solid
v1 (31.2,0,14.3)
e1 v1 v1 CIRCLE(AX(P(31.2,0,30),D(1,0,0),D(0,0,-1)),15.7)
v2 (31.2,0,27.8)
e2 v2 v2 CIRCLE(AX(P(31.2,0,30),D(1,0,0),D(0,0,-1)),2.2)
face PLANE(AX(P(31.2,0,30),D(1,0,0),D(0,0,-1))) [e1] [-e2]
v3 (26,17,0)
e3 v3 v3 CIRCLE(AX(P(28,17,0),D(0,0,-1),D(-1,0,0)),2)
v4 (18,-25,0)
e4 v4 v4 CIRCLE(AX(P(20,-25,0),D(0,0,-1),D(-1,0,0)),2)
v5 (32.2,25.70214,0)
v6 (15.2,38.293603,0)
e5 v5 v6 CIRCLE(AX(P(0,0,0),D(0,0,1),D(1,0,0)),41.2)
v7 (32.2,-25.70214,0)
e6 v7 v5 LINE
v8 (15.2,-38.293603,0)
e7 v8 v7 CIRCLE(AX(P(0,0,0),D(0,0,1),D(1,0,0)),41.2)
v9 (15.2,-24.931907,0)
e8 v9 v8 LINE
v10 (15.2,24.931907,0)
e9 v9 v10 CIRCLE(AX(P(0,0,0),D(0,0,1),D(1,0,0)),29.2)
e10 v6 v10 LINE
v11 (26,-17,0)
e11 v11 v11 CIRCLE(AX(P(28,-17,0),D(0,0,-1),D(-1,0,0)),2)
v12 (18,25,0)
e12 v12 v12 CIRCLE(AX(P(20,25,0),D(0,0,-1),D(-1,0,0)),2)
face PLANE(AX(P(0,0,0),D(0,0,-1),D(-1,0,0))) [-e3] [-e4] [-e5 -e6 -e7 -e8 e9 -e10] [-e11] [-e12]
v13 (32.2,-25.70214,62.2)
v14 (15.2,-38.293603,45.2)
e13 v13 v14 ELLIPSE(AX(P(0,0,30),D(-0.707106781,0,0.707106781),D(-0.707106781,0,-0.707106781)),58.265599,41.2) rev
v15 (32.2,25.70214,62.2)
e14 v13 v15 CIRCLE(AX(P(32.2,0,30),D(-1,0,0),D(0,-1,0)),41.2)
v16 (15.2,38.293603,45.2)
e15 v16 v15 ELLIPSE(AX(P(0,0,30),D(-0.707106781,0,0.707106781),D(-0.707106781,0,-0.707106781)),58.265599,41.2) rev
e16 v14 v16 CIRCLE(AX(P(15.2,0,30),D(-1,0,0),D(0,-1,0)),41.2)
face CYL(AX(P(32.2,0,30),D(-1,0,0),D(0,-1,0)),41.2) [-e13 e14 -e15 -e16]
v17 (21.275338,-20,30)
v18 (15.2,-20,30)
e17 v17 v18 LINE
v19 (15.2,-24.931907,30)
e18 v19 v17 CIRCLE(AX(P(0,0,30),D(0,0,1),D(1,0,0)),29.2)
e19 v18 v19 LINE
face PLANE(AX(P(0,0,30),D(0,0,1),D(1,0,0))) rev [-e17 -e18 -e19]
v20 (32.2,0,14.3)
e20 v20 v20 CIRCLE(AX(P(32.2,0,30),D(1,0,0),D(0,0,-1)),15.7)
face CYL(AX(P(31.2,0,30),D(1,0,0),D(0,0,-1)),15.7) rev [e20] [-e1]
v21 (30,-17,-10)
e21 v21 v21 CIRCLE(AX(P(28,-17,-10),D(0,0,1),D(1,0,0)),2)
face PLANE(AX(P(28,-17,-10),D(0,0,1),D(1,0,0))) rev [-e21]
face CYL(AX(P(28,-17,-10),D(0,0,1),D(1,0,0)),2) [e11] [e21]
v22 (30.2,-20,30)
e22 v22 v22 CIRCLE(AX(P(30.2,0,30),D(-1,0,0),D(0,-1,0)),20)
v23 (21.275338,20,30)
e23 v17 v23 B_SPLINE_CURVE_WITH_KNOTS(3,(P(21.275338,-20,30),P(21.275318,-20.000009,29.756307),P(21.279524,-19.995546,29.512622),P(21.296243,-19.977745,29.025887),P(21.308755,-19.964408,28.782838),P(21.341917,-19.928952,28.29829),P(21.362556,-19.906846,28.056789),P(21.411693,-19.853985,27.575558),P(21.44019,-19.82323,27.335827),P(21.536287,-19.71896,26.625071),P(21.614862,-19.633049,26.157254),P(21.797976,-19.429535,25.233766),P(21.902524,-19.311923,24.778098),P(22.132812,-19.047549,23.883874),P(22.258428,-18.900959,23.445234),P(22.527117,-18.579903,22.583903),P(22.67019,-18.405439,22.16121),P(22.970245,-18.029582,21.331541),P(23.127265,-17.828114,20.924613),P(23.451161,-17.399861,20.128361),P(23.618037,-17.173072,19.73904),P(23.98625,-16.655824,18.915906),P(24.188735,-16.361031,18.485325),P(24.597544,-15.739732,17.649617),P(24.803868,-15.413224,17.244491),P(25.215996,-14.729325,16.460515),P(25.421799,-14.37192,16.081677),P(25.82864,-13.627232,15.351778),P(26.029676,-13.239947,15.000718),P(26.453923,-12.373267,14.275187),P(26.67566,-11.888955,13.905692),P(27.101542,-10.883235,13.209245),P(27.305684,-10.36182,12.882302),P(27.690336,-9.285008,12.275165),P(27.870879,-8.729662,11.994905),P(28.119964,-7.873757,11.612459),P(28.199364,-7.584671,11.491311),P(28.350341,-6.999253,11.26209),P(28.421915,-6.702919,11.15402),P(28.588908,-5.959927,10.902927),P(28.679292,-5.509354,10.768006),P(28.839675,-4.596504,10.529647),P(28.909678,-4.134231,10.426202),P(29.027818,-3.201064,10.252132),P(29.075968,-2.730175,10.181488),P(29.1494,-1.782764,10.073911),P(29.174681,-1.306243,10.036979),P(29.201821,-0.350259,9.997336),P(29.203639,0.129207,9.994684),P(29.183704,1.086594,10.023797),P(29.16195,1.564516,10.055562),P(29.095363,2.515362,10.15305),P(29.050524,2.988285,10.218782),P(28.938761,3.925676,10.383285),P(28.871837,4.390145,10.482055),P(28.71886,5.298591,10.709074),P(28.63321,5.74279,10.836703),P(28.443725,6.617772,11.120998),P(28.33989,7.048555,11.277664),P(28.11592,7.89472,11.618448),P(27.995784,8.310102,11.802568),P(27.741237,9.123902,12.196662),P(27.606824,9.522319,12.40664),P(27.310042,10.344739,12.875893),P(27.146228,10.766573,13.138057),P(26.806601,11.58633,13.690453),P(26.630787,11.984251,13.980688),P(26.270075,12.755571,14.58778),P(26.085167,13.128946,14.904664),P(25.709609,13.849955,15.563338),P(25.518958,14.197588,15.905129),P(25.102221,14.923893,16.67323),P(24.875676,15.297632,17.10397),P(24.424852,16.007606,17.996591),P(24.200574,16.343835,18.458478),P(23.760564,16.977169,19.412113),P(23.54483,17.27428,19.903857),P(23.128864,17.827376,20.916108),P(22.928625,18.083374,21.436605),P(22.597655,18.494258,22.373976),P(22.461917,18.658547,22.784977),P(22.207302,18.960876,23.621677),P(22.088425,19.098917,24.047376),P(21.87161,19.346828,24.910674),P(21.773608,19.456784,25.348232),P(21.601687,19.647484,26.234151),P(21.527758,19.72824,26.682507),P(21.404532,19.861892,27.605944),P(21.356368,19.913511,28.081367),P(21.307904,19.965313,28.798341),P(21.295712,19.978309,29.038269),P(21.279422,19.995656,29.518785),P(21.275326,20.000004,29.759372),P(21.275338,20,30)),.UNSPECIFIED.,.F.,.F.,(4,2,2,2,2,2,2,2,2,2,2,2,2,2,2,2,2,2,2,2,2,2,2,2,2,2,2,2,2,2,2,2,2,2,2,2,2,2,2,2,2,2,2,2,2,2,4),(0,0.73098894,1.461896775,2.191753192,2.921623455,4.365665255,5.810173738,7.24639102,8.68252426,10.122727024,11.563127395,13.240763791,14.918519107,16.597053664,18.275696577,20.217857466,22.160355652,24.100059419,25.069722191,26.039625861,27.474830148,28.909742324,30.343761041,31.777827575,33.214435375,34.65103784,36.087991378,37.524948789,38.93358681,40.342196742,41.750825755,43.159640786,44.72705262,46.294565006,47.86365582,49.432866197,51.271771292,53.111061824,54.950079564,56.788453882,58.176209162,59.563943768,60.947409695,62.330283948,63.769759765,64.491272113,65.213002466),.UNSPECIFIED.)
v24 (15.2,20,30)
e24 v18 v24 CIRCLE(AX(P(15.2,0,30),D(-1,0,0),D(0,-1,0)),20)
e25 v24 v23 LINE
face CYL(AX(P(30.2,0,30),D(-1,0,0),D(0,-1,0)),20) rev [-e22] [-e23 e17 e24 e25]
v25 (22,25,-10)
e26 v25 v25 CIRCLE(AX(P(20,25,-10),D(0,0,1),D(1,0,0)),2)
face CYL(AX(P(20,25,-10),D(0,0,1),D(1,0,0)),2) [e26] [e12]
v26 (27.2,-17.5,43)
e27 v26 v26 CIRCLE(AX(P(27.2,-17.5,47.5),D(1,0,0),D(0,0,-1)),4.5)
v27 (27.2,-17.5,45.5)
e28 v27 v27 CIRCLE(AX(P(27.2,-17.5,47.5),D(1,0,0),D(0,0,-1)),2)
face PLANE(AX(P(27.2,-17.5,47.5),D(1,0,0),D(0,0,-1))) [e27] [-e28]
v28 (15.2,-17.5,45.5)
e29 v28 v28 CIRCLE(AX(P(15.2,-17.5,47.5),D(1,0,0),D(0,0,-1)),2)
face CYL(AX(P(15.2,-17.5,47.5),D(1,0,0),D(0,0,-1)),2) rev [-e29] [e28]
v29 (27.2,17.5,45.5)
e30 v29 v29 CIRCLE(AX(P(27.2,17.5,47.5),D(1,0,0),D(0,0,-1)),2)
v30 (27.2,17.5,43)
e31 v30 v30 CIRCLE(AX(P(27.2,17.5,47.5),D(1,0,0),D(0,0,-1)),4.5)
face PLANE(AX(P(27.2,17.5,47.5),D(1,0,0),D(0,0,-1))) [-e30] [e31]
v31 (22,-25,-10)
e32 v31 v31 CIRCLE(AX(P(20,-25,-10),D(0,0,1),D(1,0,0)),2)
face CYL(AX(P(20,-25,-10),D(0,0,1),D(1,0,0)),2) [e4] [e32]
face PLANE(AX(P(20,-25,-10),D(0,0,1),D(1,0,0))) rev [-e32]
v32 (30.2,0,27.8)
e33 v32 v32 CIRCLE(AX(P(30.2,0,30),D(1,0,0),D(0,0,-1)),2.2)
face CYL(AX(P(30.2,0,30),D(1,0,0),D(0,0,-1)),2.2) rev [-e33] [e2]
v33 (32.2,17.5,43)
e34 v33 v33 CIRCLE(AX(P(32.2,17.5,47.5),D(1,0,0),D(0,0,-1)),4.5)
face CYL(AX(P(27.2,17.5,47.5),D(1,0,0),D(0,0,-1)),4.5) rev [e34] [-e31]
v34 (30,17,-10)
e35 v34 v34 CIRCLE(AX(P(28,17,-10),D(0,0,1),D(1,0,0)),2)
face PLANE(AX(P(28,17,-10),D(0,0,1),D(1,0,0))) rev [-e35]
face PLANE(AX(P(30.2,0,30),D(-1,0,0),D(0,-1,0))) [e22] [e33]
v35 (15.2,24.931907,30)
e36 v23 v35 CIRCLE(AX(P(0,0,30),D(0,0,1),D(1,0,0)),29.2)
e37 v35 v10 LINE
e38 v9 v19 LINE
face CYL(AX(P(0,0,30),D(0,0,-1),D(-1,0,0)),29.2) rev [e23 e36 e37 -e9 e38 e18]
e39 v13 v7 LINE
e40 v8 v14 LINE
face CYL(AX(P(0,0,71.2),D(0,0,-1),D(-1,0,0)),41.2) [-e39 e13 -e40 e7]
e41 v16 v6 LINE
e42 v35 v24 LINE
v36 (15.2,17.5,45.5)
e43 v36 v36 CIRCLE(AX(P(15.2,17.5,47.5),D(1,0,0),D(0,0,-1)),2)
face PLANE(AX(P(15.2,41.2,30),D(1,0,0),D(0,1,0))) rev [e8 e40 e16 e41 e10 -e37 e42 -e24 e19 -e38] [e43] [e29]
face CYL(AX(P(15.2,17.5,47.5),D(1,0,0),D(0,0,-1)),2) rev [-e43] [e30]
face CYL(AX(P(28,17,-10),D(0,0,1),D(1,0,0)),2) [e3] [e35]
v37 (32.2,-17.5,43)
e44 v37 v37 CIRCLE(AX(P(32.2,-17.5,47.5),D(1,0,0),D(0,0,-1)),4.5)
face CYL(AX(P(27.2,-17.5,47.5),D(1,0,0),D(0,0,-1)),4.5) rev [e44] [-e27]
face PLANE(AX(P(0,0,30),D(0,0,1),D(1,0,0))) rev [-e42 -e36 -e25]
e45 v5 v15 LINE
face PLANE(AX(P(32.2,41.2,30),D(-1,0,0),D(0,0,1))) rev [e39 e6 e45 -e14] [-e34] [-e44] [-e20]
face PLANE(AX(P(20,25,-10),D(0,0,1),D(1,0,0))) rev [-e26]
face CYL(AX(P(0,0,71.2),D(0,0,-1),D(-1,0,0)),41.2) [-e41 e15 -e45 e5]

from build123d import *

# Parameters (mm, degrees)
SKETCH_1_W           = 17
SKETCH_1_H           = 82.4
EXTRUDE_1_DEPTH      = 30
EXTRUDE_2_DEPTH      = 17
CUT_EXTRUDE_1_DEPTH  = 62.2
SKETCH_4_R           = 2
EXTRUDE_3_DEPTH      = 10
SKETCH_5_R           = 20
CUT_EXTRUDE_2_DEPTH  = 15
SKETCH_6_R           = 15.7
CUT_EXTRUDE_3_DEPTH  = 1
SKETCH_7_R           = 2.2
CUT_EXTRUDE_4_DEPTH  = 1
SKETCH_8_R           = 29.2
CUT_EXTRUDE_7_DEPTH  = 30
SKETCH_9_R           = 4.5
CUT_EXTRUDE_9_DEPTH  = 5
SKETCH_10_R          = 2
CUT_EXTRUDE_10_DEPTH = 12


# Read off the part's stored shape, not the designer's step: 切除-拉伸1
with BuildPart() as part:
    # 草图1 → 凸台-拉伸1 (new body)
    with BuildSketch(Plane.XY):
        with Locations((23.7, 0)):
            Rectangle(SKETCH_1_W, SKETCH_1_H)
    extrude(amount=EXTRUDE_1_DEPTH)

    # 草图2 → 凸台-拉伸2 (add)
    with BuildSketch(Plane.ZY.offset(-15.2)):
        with BuildLine():
            Line((30, -41.2), (30, 41.2))
            ThreePointArc((30, 41.2), (71.2, 0), (30, -41.2))
        make_face()
    extrude(amount=-EXTRUDE_2_DEPTH)

    # 切除-拉伸1 outline → 切除-拉伸1 (cut)
    with BuildSketch(Plane.XY):
        with BuildLine():
            Line((32.2, -41.2), (32.2, -25.702139989))
            ThreePointArc((32.2, -25.702139989), (24.521954096, -33.107608904), (15.2, -38.293602599))
            Line((15.2, -38.293602599), (15.2, -41.2))
            Line((15.2, -41.2), (32.2, -41.2))
        make_face()
        with BuildLine():
            ThreePointArc((15.2, 38.293602599), (24.521954096, 33.107608904), (32.2, 25.702139989))
            Line((32.2, 25.702139989), (32.2, 41.2))
            Line((32.2, 41.2), (15.2, 41.2))
            Line((15.2, 41.2), (15.2, 38.293602599))
        make_face()
    extrude(amount=CUT_EXTRUDE_1_DEPTH, mode=Mode.SUBTRACT)

    # 草图4 → 凸台-拉伸3 (add)
    with BuildSketch(Plane.XY):
        with Locations((20, 25)):
            Circle(SKETCH_4_R)
        with Locations((28, 17)):
            Circle(SKETCH_4_R)
        with Locations((20, -25)):
            Circle(SKETCH_4_R)
        with Locations((28, -17)):
            Circle(SKETCH_4_R)
    extrude(amount=-EXTRUDE_3_DEPTH)

    # 草图5 → 切除-拉伸2 (cut)
    with BuildSketch(Plane.ZY.offset(-15.2)):
        with Locations(Location((30, 0, 0), (0, 0, 270))):
            Circle(SKETCH_5_R)
    extrude(amount=-CUT_EXTRUDE_2_DEPTH, mode=Mode.SUBTRACT)

    # 草图6 → 切除-拉伸3 (cut)
    with BuildSketch(Plane(origin=(32.2, 0, 0), x_dir=(0, 0, -1), z_dir=(1, 0, 0))):
        with Locations((-30, 0)):
            Circle(SKETCH_6_R)
    extrude(amount=-CUT_EXTRUDE_3_DEPTH, mode=Mode.SUBTRACT)

    # 草图7 → 切除-拉伸4 (cut)
    with BuildSketch(Plane(origin=(31.2, 0, 0), x_dir=(0, 0, -1), z_dir=(1, 0, 0))):
        with Locations((-30, 0)):
            Circle(SKETCH_7_R)
    extrude(amount=-CUT_EXTRUDE_4_DEPTH, mode=Mode.SUBTRACT)

    # 草图8 → 切除-拉伸7 (cut)
    with BuildSketch(Plane.XY):
        Circle(SKETCH_8_R)
    extrude(amount=CUT_EXTRUDE_7_DEPTH, mode=Mode.SUBTRACT)

    # 草图9 → 切除-拉伸9 (cut)
    with BuildSketch(Plane(origin=(32.2, 0, 0), x_dir=(0, 0, -1), z_dir=(1, 0, 0))):
        with Locations((-47.5, 17.5)):
            Circle(SKETCH_9_R)
        with Locations((-47.5, -17.5)):
            Circle(SKETCH_9_R)
    extrude(amount=-CUT_EXTRUDE_9_DEPTH, mode=Mode.SUBTRACT)

    # 草图10 → 切除-拉伸10 (cut)
    with BuildSketch(Plane(origin=(27.2, 0, 0), x_dir=(0, 0, -1), z_dir=(1, 0, 0))):
        with Locations((-47.5, 17.5)):
            Circle(SKETCH_10_R)
        with Locations((-47.5, -17.5)):
            Circle(SKETCH_10_R)
    extrude(amount=-CUT_EXTRUDE_10_DEPTH, mode=Mode.SUBTRACT)


solid = part.part
